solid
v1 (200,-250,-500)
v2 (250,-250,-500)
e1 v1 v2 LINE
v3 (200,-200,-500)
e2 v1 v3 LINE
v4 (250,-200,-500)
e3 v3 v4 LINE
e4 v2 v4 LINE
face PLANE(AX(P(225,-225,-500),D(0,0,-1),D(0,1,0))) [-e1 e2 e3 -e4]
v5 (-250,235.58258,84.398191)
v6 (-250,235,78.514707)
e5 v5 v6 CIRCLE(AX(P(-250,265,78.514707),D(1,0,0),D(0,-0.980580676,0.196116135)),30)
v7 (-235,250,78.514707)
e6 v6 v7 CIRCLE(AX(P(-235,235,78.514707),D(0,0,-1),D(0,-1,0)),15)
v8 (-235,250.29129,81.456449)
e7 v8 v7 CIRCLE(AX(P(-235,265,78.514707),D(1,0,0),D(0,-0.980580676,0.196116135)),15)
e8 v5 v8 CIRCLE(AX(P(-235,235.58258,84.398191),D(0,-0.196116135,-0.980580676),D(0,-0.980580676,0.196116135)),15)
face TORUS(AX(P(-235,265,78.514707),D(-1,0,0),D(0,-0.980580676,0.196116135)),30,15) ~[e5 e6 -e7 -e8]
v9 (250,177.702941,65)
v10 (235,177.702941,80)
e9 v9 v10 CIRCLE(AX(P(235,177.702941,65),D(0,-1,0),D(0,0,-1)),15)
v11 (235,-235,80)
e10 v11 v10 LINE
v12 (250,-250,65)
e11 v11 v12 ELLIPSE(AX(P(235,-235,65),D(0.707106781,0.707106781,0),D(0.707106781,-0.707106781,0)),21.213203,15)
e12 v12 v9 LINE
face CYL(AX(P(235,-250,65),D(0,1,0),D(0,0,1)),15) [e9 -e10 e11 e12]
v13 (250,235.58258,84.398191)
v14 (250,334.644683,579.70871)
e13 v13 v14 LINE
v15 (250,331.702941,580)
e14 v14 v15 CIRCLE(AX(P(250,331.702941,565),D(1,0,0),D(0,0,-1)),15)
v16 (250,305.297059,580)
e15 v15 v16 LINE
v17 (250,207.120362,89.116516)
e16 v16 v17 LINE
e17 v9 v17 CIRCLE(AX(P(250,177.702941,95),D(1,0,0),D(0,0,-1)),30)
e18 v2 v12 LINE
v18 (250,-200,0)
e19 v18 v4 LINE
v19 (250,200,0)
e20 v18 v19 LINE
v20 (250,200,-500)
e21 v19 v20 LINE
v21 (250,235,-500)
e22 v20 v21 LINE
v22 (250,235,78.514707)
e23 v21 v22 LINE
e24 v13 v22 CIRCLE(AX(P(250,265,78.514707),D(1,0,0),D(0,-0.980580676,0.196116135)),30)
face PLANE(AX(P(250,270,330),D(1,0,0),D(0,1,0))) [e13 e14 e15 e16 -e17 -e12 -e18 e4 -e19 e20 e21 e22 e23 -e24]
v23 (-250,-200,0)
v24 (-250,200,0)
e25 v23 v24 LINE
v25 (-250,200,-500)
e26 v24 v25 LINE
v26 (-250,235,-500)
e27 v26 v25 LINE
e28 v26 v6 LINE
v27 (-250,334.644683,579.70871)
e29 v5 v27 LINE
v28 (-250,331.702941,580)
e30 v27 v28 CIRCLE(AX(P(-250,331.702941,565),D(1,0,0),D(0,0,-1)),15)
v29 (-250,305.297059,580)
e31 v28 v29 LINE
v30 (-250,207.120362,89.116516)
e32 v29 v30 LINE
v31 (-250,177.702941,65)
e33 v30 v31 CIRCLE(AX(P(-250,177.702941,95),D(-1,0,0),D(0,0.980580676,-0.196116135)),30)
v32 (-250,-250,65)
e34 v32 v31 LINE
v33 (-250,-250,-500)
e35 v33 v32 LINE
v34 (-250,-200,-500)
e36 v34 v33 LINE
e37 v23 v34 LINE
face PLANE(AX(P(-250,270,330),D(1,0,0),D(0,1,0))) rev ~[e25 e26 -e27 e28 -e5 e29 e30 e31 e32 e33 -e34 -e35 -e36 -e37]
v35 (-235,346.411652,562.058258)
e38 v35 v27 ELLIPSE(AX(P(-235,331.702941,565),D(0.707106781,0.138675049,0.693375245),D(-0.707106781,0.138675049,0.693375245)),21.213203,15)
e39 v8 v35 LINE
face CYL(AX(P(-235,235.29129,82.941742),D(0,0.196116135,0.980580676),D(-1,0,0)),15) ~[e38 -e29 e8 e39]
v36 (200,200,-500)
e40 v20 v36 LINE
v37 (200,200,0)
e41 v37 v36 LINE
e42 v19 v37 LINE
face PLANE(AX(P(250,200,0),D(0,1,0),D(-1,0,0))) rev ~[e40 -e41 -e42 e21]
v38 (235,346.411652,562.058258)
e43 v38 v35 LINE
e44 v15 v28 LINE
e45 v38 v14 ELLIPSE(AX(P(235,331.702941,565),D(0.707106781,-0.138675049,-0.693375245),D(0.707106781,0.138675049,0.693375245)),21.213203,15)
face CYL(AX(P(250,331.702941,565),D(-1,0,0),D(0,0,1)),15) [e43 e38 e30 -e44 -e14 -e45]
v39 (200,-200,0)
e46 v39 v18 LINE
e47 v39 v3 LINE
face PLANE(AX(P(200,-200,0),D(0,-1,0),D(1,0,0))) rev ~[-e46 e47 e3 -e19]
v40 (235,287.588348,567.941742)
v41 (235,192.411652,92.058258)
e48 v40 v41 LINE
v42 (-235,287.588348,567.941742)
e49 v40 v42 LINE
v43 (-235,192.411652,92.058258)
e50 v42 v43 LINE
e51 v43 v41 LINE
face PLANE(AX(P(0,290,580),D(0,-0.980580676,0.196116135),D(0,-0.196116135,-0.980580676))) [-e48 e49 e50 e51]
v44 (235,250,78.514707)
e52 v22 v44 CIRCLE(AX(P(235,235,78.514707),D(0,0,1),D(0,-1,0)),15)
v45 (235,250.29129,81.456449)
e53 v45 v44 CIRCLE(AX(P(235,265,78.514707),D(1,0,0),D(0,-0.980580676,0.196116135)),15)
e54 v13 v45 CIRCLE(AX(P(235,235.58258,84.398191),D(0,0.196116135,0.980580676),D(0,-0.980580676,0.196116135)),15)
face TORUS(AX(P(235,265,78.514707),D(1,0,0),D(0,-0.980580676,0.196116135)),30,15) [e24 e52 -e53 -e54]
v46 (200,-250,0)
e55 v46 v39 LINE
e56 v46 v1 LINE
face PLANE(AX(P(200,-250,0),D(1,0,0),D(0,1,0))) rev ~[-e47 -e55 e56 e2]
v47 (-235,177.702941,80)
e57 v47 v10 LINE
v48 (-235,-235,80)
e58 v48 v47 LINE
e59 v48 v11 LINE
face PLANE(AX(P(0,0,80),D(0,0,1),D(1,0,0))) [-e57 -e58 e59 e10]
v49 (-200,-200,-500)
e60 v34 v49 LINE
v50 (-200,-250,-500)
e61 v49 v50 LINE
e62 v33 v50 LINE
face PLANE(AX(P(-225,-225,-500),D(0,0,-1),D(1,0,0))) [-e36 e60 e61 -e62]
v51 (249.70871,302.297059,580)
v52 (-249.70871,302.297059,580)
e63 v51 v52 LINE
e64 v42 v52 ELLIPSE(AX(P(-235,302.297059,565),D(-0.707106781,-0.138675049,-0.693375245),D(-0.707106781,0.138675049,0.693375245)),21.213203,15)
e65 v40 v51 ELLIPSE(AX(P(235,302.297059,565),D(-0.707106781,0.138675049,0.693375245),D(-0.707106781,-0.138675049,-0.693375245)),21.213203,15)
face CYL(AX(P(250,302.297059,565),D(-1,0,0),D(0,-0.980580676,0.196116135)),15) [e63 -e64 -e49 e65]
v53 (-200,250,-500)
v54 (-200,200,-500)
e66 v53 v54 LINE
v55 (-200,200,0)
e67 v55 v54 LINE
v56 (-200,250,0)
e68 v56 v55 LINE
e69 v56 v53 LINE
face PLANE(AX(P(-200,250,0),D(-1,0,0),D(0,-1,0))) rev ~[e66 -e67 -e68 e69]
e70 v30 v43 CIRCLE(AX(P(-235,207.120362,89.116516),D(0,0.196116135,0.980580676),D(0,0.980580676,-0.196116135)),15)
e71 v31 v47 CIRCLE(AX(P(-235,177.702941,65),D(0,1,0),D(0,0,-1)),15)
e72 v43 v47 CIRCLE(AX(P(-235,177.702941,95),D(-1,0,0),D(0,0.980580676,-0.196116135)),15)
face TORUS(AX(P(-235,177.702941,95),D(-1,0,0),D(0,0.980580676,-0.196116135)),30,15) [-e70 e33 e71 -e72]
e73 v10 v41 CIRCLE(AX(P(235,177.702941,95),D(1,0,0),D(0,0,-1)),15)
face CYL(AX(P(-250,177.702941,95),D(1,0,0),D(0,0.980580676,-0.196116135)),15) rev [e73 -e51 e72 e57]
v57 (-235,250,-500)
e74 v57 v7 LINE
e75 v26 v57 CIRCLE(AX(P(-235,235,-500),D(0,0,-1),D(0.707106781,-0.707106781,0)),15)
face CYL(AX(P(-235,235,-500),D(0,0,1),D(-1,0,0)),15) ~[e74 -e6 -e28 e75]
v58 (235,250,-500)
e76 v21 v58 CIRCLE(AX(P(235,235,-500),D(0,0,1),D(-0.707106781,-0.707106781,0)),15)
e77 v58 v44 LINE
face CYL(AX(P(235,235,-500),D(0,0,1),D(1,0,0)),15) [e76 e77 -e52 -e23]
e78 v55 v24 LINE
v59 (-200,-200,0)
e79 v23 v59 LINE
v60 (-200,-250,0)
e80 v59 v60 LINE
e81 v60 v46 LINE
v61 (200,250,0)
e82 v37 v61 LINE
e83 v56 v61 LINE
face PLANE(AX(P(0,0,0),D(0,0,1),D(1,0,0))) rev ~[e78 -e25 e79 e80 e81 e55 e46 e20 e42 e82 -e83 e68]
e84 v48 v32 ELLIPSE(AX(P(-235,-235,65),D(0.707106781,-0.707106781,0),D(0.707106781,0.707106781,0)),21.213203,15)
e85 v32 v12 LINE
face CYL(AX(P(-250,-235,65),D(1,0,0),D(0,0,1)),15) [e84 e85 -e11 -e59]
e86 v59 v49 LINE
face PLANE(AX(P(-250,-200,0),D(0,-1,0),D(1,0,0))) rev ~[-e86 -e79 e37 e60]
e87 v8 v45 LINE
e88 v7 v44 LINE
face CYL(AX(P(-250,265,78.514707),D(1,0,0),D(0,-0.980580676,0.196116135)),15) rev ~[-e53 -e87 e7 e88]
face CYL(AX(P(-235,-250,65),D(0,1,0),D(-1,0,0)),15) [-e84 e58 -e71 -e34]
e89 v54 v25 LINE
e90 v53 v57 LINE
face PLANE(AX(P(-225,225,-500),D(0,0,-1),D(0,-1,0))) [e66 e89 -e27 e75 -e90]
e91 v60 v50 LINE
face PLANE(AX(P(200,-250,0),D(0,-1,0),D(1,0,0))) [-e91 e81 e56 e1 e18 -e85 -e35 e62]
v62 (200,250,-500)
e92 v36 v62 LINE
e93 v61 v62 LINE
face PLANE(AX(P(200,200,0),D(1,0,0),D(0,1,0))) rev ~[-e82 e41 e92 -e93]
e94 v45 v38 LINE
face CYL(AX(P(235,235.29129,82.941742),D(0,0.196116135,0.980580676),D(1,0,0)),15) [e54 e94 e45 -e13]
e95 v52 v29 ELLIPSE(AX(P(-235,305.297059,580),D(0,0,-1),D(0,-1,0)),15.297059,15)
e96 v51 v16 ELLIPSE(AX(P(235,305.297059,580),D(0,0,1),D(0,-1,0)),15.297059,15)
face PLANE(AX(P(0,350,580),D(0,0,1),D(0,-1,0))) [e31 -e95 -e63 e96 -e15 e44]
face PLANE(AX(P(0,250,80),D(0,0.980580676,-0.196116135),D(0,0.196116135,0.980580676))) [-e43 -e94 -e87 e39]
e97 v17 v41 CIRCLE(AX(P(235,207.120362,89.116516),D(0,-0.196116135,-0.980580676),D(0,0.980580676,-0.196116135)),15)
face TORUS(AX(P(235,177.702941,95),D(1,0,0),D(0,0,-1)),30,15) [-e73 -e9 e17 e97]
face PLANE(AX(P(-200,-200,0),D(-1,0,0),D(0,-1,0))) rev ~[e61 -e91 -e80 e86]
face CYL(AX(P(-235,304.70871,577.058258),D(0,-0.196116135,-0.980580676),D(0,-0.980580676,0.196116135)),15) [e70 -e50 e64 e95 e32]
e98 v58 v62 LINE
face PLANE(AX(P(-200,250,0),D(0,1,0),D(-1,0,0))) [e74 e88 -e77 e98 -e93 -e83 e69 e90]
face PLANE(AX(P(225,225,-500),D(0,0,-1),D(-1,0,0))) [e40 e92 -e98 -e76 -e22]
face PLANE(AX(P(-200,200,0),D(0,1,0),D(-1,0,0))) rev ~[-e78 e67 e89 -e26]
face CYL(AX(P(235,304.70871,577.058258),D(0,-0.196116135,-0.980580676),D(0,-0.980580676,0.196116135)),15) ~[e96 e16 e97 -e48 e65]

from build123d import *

# Parameters (mm, degrees)
F0_W            = 500
F0_H            = 500
F1_DEPTH        = 80
F2_W            = 50
F2_H            = 50
F3_DEPTH        = 500
F3_COPIES_COUNT = 4
F6_DEPTH        = 250
F7_R            = 15


# Not quite as in the source:
# - a pattern or mirror of a feature is missing from the dataset's text; its kind, count and spacing are read off the source's solid


with BuildPart() as f1:
    # F0 (on Top) → F1 (new body)
    with BuildSketch(Plane.XY):
        Rectangle(F0_W, F0_H)
    extrude(amount=F1_DEPTH)

    # F2 (on face) → F3 (join)
    with BuildSketch(Plane(origin=(0, 0, 0), x_dir=(1, 0, 0), z_dir=(0, 0, -1))):
        with Locations((-225, 225)):
            Rectangle(F2_W, F2_H)
    f3 = extrude(amount=F3_DEPTH)

    # F3_copies: F3 ×4 about axis
    f3_copies_axis = Axis((0, 0, 0), (0, 0, 1))
    for i in range(1, F3_COPIES_COUNT):
        add(f3.rotate(f3_copies_axis, i * 360 / F3_COPIES_COUNT))

    # F5 (on Right) → F6 (join, symmetric)
    with BuildSketch(Plane.YZ):
        Polygon((290, 580), (190, 80), (250, 80), (350, 580), align=None)
    extrude(amount=F6_DEPTH, both=True)

    # F7
    f7_edges = [f1.edges().sort_by_distance(p)[0] for p in [
        (0, -250, 80),
        (-250, -30, 80),
        (0, 190, 80),
        (250, -30, 80),
        (-250, 240, 330),
        (250, 240, 330),
        (0, 290, 580),
        (0, 250, 80),
        (-250, 300, 330),
        (0, 350, 580),
        (250, 300, 330),
        (250, 250, -210),
        (-250, 250, -210),
    ]]
    fillet(f7_edges, radius=F7_R)


solid = f1.part
